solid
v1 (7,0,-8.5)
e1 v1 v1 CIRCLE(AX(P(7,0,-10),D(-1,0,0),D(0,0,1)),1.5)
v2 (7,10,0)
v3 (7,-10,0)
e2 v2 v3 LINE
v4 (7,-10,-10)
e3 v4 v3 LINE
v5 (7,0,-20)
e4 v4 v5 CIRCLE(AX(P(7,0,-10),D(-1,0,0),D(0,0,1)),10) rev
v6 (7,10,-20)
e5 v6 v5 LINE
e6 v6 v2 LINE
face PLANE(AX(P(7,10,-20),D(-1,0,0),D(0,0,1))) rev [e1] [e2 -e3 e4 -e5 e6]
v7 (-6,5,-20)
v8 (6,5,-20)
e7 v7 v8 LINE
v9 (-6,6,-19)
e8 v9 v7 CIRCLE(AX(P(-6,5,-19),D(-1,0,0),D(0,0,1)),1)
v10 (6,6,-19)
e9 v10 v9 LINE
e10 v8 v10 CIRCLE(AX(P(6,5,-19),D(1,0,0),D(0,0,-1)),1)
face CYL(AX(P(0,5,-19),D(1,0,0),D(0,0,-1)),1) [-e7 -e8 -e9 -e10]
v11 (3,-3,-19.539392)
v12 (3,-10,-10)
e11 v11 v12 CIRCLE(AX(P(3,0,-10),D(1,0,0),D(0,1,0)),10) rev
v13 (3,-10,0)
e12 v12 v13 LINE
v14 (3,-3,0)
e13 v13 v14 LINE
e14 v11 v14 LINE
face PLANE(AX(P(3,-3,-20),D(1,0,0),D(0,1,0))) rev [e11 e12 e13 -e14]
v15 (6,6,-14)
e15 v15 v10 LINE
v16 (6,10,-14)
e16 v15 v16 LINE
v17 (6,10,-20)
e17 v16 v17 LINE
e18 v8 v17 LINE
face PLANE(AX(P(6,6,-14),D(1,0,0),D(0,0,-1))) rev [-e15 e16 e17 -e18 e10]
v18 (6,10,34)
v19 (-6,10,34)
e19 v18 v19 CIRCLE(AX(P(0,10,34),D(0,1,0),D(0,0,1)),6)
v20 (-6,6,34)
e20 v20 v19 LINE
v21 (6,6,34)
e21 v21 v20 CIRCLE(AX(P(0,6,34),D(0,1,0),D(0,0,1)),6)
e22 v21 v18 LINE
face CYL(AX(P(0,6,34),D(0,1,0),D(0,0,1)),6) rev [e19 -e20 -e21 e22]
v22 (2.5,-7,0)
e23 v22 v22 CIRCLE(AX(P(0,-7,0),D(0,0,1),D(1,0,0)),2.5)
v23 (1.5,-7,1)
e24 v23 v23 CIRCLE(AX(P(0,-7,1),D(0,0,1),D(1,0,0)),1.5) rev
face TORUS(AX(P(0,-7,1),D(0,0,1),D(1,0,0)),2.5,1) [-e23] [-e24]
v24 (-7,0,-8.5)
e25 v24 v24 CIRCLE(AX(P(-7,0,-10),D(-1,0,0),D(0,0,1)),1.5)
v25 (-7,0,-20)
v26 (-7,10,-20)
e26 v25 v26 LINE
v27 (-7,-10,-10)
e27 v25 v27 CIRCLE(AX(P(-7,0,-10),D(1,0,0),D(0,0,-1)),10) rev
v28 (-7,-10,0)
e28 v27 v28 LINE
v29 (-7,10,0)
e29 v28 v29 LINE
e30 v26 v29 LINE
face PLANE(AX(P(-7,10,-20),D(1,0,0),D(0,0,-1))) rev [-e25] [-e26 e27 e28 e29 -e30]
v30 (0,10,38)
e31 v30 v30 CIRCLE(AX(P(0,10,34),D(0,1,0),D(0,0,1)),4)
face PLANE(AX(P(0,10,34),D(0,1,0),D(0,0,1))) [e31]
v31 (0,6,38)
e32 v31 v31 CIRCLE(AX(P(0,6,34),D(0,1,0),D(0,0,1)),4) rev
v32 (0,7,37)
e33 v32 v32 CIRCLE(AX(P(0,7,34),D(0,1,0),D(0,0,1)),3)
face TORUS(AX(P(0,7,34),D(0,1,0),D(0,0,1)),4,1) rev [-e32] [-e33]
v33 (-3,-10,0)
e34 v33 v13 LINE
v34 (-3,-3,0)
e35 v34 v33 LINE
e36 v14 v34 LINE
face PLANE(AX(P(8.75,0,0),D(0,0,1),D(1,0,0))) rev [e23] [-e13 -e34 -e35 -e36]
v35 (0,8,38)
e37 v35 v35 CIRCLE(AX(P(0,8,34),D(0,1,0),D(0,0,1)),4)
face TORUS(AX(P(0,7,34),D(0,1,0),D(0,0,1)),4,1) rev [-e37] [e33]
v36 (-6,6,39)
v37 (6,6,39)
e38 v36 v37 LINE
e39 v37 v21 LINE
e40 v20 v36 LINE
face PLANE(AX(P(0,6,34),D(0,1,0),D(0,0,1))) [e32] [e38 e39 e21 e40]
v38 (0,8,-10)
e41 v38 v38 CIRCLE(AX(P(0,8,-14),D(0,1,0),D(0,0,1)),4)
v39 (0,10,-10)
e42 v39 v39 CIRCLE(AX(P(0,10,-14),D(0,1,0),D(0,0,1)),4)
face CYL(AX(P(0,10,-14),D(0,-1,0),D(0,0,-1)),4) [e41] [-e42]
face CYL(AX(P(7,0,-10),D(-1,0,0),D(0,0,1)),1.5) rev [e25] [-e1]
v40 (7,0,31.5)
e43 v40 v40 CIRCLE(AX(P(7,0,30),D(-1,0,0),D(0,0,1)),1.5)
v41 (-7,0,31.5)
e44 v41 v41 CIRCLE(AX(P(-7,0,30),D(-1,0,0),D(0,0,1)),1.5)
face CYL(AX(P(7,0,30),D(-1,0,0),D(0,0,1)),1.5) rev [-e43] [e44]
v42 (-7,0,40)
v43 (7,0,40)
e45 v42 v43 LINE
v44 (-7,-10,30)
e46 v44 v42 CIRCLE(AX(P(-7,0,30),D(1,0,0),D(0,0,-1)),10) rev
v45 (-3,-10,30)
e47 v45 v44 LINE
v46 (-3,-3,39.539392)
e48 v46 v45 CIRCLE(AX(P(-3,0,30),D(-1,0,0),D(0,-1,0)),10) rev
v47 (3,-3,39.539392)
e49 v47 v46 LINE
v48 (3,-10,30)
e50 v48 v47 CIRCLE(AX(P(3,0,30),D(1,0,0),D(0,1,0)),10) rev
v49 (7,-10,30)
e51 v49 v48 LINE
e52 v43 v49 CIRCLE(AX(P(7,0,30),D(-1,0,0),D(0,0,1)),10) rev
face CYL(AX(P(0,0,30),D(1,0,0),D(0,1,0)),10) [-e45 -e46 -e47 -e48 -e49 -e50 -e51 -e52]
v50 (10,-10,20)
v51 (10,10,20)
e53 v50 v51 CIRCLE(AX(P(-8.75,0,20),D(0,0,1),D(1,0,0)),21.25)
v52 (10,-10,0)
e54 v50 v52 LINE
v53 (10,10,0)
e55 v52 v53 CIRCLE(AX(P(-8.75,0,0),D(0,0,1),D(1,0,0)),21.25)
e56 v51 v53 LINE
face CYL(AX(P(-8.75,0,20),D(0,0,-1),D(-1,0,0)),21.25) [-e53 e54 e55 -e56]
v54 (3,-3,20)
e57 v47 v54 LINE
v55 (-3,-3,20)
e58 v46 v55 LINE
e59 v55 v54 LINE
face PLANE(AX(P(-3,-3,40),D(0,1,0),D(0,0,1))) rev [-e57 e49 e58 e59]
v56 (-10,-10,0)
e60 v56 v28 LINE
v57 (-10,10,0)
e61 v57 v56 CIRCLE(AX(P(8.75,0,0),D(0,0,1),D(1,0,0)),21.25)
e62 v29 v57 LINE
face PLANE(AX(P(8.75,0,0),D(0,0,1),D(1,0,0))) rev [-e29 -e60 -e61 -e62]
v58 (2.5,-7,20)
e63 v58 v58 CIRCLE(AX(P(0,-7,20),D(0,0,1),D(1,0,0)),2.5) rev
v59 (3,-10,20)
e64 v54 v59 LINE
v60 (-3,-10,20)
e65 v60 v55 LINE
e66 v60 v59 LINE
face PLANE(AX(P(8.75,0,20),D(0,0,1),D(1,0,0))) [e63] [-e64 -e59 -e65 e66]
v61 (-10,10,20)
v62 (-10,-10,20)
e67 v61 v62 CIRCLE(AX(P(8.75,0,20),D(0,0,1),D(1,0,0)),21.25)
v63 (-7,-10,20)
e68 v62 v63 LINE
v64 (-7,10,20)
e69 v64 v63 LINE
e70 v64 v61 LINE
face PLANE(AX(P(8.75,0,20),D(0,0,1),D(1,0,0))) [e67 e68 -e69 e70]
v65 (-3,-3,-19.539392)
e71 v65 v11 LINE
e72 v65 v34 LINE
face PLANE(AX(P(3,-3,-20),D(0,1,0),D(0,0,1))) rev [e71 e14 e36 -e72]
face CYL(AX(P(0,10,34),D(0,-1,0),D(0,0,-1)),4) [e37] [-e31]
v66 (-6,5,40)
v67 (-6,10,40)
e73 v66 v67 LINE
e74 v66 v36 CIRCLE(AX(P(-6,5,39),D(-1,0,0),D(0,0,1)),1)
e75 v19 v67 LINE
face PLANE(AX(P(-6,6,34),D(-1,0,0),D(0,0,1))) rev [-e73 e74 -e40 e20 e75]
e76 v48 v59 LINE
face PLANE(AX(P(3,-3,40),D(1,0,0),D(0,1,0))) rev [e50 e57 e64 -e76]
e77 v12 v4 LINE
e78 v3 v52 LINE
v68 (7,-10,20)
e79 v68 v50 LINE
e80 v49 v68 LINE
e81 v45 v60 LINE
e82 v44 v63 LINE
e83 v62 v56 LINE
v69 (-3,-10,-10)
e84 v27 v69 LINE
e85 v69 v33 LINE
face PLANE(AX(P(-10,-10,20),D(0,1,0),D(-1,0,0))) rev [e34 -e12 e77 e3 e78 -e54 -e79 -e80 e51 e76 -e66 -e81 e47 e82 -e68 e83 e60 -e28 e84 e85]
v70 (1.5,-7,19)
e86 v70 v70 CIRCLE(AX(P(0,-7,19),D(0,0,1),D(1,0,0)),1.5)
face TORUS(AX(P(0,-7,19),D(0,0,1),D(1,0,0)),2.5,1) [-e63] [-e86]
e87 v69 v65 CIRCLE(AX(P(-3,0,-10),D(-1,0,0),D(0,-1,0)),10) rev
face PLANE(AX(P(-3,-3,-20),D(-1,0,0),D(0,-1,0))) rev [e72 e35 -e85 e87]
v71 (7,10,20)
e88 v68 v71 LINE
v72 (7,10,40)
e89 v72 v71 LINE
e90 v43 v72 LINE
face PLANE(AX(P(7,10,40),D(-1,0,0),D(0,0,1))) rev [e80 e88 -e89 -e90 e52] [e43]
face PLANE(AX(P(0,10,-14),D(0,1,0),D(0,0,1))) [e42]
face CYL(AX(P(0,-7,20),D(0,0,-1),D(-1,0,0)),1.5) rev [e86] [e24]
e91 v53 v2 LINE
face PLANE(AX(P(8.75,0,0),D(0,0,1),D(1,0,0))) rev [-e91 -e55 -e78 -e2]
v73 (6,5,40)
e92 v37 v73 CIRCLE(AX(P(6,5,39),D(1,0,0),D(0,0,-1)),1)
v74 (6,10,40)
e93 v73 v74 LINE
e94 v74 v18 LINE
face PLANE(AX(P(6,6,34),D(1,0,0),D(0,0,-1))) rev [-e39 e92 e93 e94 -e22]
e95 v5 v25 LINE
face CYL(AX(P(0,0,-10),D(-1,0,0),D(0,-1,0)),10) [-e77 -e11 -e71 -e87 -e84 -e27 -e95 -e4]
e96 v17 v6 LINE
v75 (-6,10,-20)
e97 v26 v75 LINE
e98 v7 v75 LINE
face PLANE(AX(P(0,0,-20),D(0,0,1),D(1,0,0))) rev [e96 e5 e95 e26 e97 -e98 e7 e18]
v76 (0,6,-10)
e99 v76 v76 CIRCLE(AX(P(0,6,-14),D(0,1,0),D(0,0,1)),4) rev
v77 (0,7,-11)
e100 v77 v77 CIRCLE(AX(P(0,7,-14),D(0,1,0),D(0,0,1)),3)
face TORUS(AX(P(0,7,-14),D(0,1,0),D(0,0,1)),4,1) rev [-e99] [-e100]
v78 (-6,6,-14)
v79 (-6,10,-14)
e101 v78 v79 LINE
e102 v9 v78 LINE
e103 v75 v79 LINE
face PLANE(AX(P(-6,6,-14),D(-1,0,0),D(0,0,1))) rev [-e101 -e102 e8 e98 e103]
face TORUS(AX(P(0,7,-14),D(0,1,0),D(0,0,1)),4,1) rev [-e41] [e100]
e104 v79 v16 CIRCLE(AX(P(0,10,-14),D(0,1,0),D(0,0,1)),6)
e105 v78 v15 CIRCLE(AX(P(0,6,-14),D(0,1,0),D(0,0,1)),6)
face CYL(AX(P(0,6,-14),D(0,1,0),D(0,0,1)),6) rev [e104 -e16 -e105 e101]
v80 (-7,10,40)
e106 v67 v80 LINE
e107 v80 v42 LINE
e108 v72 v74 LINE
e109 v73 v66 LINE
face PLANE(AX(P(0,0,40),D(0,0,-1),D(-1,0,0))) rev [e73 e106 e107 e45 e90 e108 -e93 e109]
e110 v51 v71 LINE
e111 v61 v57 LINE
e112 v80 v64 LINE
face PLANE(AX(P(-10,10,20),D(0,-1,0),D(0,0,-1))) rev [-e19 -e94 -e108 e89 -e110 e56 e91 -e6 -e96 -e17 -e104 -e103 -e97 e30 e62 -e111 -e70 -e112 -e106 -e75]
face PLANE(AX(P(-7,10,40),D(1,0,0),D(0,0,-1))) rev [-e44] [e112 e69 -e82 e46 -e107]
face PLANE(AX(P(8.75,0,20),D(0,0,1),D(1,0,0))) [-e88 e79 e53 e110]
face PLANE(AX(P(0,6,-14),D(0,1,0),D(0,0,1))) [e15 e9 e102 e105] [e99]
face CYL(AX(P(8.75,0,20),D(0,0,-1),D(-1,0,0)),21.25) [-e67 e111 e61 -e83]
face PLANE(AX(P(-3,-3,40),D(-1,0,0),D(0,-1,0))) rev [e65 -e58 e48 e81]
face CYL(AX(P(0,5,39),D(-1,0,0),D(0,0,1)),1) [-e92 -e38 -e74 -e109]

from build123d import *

# Parameters (mm, degrees)
SALIENTE_EXTRUIR1_DEPTH = 20
CROQUIS5_R              = 1.5
CORTAR_EXTRUIR3_DEPTH   = 20
SALIENTE_EXTRUIR2_DEPTH = 20
SALIENTE_EXTRUIR3_DEPTH = 20
CROQUIS4_R              = 1.5
CORTAR_EXTRUIR2_DEPTH   = 14
REDONDEO1_R             = 10
CUT_EXTRUDE1_DEPTH      = 4
SKETCH2_R               = 3
BOSS_EXTRUDE1_DEPTH     = 2
SKETCH3_R               = 4
BOSS_EXTRUDE2_DEPTH     = 2
FILLET1_R               = 1
FILLET2_R               = 1
FILLET3_R               = 1


with BuildPart() as part:
    # Croquis1 → Saliente-Extruir1 (new body)
    with BuildSketch(Plane.XY):
        with BuildLine():
            Line((-10, 10), (10, 10))
            ThreePointArc((10, 10), (12.5, 0), (10, -10))
            Line((10, -10), (-10, -10))
            ThreePointArc((-10, -10), (-12.5, 0), (-10, 10))
        make_face()
    extrude(amount=SALIENTE_EXTRUIR1_DEPTH)

    # Croquis5 → Cortar-Extruir3 (cut)
    with BuildSketch(Plane(origin=(0, 0, 0), x_dir=(-1, 0, 0), z_dir=(0, 0, -1))):
        with Locations((0, -7)):
            Circle(CROQUIS5_R)
    extrude(amount=-CORTAR_EXTRUIR3_DEPTH, mode=Mode.SUBTRACT)

    # Croquis2 → Saliente-Extruir2 (add)
    with BuildSketch(Plane(origin=(0, 0, 0), x_dir=(-1, 0, 0), z_dir=(0, 0, -1))):
        Polygon((-7, 10), (-7, -10), (-3, -10), (-3, -3), (3, -3), (3, -10), (7, -10), (7, 10), align=None)
    extrude(amount=SALIENTE_EXTRUIR2_DEPTH)

    # Croquis3 → Saliente-Extruir3 (add)
    with BuildSketch(Plane.XY.offset(20)):
        Polygon((-7, 10), (-7, -10), (-3, -10), (-3, -3), (3, -3), (3, -10), (7, -10), (7, 10), align=None)
    extrude(amount=SALIENTE_EXTRUIR3_DEPTH)

    # Croquis4 → Cortar-Extruir2 (cut)
    with BuildSketch(Plane.ZY.offset(7)):
        with Locations((-10, 0)):
            Circle(CROQUIS4_R)
        with Locations((30, 0)):
            Circle(CROQUIS4_R)
    extrude(amount=-CORTAR_EXTRUIR2_DEPTH, mode=Mode.SUBTRACT)

    # Redondeo1
    redondeo1_edges = [part.edges().sort_by_distance(p)[0] for p in [
        (-5, -10, 40),
        (-5, -10, -20),
    ]]
    fillet(redondeo1_edges, radius=REDONDEO1_R)

    # Sketch1 → Cut-Extrude1 (cut)
    with BuildSketch(Plane(origin=(0, 10, 0), x_dir=(1, 0, 0), z_dir=(0, 1, 0))):
        with BuildLine():
            Line((-6, 14), (-6, 20))
            Line((-6, 20), (6, 20))
            Line((6, 20), (6, 14))
            ThreePointArc((6, 14), (0, 8), (-6, 14))
        make_face()
        with BuildLine():
            Line((-6, -34), (-6, -40))
            Line((-6, -40), (6, -40))
            Line((6, -40), (6, -34))
            ThreePointArc((6, -34), (0, -28), (-6, -34))
        make_face()
    extrude(amount=-CUT_EXTRUDE1_DEPTH, mode=Mode.SUBTRACT)

    # Sketch2 → Boss-Extrude1 (add)
    with BuildSketch(Plane(origin=(0, 6, 0), x_dir=(1, 0, 0), z_dir=(0, 1, 0))):
        with Locations(Location((0, -34, 0), (0, 0, 270))):
            Circle(SKETCH2_R)
        with Locations(Location((0, 14, 0), (0, 0, 270))):
            Circle(SKETCH2_R)
    extrude(amount=BOSS_EXTRUDE1_DEPTH)

    # Sketch3 → Boss-Extrude2 (add)
    with BuildSketch(Plane(origin=(0, 8, 0), x_dir=(1, 0, 0), z_dir=(0, 1, 0))):
        with Locations(Location((0, -34, 0), (0, 0, 270))):
            Circle(SKETCH3_R)
        with Locations(Location((0, 14, 0), (0, 0, 270))):
            Circle(SKETCH3_R)
    extrude(amount=BOSS_EXTRUDE2_DEPTH)

    # Fillet1
    fillet1_edges = [part.edges().sort_by_distance(p)[0] for p in [
        (0, 6, 31),
        (0, 8, 31),
        (0, 6, -17),
        (0, 8, -17),
    ]]
    fillet(fillet1_edges, radius=FILLET1_R - 0.0001)  # a hair under: the kernel refuses the full size

    # Fillet2
    fillet2_edges = [part.edges().sort_by_distance(p)[0] for p in [
        (0, 6, 40),
        (0, 6, -20),
    ]]
    fillet(fillet2_edges, radius=FILLET2_R)

    # Fillet3
    fillet3_edges = [part.edges().sort_by_distance(p)[0] for p in [
        (1.5, -7, 20),
        (1.5, -7, 0),
    ]]
    fillet(fillet3_edges, radius=FILLET3_R)


solid = part.part
